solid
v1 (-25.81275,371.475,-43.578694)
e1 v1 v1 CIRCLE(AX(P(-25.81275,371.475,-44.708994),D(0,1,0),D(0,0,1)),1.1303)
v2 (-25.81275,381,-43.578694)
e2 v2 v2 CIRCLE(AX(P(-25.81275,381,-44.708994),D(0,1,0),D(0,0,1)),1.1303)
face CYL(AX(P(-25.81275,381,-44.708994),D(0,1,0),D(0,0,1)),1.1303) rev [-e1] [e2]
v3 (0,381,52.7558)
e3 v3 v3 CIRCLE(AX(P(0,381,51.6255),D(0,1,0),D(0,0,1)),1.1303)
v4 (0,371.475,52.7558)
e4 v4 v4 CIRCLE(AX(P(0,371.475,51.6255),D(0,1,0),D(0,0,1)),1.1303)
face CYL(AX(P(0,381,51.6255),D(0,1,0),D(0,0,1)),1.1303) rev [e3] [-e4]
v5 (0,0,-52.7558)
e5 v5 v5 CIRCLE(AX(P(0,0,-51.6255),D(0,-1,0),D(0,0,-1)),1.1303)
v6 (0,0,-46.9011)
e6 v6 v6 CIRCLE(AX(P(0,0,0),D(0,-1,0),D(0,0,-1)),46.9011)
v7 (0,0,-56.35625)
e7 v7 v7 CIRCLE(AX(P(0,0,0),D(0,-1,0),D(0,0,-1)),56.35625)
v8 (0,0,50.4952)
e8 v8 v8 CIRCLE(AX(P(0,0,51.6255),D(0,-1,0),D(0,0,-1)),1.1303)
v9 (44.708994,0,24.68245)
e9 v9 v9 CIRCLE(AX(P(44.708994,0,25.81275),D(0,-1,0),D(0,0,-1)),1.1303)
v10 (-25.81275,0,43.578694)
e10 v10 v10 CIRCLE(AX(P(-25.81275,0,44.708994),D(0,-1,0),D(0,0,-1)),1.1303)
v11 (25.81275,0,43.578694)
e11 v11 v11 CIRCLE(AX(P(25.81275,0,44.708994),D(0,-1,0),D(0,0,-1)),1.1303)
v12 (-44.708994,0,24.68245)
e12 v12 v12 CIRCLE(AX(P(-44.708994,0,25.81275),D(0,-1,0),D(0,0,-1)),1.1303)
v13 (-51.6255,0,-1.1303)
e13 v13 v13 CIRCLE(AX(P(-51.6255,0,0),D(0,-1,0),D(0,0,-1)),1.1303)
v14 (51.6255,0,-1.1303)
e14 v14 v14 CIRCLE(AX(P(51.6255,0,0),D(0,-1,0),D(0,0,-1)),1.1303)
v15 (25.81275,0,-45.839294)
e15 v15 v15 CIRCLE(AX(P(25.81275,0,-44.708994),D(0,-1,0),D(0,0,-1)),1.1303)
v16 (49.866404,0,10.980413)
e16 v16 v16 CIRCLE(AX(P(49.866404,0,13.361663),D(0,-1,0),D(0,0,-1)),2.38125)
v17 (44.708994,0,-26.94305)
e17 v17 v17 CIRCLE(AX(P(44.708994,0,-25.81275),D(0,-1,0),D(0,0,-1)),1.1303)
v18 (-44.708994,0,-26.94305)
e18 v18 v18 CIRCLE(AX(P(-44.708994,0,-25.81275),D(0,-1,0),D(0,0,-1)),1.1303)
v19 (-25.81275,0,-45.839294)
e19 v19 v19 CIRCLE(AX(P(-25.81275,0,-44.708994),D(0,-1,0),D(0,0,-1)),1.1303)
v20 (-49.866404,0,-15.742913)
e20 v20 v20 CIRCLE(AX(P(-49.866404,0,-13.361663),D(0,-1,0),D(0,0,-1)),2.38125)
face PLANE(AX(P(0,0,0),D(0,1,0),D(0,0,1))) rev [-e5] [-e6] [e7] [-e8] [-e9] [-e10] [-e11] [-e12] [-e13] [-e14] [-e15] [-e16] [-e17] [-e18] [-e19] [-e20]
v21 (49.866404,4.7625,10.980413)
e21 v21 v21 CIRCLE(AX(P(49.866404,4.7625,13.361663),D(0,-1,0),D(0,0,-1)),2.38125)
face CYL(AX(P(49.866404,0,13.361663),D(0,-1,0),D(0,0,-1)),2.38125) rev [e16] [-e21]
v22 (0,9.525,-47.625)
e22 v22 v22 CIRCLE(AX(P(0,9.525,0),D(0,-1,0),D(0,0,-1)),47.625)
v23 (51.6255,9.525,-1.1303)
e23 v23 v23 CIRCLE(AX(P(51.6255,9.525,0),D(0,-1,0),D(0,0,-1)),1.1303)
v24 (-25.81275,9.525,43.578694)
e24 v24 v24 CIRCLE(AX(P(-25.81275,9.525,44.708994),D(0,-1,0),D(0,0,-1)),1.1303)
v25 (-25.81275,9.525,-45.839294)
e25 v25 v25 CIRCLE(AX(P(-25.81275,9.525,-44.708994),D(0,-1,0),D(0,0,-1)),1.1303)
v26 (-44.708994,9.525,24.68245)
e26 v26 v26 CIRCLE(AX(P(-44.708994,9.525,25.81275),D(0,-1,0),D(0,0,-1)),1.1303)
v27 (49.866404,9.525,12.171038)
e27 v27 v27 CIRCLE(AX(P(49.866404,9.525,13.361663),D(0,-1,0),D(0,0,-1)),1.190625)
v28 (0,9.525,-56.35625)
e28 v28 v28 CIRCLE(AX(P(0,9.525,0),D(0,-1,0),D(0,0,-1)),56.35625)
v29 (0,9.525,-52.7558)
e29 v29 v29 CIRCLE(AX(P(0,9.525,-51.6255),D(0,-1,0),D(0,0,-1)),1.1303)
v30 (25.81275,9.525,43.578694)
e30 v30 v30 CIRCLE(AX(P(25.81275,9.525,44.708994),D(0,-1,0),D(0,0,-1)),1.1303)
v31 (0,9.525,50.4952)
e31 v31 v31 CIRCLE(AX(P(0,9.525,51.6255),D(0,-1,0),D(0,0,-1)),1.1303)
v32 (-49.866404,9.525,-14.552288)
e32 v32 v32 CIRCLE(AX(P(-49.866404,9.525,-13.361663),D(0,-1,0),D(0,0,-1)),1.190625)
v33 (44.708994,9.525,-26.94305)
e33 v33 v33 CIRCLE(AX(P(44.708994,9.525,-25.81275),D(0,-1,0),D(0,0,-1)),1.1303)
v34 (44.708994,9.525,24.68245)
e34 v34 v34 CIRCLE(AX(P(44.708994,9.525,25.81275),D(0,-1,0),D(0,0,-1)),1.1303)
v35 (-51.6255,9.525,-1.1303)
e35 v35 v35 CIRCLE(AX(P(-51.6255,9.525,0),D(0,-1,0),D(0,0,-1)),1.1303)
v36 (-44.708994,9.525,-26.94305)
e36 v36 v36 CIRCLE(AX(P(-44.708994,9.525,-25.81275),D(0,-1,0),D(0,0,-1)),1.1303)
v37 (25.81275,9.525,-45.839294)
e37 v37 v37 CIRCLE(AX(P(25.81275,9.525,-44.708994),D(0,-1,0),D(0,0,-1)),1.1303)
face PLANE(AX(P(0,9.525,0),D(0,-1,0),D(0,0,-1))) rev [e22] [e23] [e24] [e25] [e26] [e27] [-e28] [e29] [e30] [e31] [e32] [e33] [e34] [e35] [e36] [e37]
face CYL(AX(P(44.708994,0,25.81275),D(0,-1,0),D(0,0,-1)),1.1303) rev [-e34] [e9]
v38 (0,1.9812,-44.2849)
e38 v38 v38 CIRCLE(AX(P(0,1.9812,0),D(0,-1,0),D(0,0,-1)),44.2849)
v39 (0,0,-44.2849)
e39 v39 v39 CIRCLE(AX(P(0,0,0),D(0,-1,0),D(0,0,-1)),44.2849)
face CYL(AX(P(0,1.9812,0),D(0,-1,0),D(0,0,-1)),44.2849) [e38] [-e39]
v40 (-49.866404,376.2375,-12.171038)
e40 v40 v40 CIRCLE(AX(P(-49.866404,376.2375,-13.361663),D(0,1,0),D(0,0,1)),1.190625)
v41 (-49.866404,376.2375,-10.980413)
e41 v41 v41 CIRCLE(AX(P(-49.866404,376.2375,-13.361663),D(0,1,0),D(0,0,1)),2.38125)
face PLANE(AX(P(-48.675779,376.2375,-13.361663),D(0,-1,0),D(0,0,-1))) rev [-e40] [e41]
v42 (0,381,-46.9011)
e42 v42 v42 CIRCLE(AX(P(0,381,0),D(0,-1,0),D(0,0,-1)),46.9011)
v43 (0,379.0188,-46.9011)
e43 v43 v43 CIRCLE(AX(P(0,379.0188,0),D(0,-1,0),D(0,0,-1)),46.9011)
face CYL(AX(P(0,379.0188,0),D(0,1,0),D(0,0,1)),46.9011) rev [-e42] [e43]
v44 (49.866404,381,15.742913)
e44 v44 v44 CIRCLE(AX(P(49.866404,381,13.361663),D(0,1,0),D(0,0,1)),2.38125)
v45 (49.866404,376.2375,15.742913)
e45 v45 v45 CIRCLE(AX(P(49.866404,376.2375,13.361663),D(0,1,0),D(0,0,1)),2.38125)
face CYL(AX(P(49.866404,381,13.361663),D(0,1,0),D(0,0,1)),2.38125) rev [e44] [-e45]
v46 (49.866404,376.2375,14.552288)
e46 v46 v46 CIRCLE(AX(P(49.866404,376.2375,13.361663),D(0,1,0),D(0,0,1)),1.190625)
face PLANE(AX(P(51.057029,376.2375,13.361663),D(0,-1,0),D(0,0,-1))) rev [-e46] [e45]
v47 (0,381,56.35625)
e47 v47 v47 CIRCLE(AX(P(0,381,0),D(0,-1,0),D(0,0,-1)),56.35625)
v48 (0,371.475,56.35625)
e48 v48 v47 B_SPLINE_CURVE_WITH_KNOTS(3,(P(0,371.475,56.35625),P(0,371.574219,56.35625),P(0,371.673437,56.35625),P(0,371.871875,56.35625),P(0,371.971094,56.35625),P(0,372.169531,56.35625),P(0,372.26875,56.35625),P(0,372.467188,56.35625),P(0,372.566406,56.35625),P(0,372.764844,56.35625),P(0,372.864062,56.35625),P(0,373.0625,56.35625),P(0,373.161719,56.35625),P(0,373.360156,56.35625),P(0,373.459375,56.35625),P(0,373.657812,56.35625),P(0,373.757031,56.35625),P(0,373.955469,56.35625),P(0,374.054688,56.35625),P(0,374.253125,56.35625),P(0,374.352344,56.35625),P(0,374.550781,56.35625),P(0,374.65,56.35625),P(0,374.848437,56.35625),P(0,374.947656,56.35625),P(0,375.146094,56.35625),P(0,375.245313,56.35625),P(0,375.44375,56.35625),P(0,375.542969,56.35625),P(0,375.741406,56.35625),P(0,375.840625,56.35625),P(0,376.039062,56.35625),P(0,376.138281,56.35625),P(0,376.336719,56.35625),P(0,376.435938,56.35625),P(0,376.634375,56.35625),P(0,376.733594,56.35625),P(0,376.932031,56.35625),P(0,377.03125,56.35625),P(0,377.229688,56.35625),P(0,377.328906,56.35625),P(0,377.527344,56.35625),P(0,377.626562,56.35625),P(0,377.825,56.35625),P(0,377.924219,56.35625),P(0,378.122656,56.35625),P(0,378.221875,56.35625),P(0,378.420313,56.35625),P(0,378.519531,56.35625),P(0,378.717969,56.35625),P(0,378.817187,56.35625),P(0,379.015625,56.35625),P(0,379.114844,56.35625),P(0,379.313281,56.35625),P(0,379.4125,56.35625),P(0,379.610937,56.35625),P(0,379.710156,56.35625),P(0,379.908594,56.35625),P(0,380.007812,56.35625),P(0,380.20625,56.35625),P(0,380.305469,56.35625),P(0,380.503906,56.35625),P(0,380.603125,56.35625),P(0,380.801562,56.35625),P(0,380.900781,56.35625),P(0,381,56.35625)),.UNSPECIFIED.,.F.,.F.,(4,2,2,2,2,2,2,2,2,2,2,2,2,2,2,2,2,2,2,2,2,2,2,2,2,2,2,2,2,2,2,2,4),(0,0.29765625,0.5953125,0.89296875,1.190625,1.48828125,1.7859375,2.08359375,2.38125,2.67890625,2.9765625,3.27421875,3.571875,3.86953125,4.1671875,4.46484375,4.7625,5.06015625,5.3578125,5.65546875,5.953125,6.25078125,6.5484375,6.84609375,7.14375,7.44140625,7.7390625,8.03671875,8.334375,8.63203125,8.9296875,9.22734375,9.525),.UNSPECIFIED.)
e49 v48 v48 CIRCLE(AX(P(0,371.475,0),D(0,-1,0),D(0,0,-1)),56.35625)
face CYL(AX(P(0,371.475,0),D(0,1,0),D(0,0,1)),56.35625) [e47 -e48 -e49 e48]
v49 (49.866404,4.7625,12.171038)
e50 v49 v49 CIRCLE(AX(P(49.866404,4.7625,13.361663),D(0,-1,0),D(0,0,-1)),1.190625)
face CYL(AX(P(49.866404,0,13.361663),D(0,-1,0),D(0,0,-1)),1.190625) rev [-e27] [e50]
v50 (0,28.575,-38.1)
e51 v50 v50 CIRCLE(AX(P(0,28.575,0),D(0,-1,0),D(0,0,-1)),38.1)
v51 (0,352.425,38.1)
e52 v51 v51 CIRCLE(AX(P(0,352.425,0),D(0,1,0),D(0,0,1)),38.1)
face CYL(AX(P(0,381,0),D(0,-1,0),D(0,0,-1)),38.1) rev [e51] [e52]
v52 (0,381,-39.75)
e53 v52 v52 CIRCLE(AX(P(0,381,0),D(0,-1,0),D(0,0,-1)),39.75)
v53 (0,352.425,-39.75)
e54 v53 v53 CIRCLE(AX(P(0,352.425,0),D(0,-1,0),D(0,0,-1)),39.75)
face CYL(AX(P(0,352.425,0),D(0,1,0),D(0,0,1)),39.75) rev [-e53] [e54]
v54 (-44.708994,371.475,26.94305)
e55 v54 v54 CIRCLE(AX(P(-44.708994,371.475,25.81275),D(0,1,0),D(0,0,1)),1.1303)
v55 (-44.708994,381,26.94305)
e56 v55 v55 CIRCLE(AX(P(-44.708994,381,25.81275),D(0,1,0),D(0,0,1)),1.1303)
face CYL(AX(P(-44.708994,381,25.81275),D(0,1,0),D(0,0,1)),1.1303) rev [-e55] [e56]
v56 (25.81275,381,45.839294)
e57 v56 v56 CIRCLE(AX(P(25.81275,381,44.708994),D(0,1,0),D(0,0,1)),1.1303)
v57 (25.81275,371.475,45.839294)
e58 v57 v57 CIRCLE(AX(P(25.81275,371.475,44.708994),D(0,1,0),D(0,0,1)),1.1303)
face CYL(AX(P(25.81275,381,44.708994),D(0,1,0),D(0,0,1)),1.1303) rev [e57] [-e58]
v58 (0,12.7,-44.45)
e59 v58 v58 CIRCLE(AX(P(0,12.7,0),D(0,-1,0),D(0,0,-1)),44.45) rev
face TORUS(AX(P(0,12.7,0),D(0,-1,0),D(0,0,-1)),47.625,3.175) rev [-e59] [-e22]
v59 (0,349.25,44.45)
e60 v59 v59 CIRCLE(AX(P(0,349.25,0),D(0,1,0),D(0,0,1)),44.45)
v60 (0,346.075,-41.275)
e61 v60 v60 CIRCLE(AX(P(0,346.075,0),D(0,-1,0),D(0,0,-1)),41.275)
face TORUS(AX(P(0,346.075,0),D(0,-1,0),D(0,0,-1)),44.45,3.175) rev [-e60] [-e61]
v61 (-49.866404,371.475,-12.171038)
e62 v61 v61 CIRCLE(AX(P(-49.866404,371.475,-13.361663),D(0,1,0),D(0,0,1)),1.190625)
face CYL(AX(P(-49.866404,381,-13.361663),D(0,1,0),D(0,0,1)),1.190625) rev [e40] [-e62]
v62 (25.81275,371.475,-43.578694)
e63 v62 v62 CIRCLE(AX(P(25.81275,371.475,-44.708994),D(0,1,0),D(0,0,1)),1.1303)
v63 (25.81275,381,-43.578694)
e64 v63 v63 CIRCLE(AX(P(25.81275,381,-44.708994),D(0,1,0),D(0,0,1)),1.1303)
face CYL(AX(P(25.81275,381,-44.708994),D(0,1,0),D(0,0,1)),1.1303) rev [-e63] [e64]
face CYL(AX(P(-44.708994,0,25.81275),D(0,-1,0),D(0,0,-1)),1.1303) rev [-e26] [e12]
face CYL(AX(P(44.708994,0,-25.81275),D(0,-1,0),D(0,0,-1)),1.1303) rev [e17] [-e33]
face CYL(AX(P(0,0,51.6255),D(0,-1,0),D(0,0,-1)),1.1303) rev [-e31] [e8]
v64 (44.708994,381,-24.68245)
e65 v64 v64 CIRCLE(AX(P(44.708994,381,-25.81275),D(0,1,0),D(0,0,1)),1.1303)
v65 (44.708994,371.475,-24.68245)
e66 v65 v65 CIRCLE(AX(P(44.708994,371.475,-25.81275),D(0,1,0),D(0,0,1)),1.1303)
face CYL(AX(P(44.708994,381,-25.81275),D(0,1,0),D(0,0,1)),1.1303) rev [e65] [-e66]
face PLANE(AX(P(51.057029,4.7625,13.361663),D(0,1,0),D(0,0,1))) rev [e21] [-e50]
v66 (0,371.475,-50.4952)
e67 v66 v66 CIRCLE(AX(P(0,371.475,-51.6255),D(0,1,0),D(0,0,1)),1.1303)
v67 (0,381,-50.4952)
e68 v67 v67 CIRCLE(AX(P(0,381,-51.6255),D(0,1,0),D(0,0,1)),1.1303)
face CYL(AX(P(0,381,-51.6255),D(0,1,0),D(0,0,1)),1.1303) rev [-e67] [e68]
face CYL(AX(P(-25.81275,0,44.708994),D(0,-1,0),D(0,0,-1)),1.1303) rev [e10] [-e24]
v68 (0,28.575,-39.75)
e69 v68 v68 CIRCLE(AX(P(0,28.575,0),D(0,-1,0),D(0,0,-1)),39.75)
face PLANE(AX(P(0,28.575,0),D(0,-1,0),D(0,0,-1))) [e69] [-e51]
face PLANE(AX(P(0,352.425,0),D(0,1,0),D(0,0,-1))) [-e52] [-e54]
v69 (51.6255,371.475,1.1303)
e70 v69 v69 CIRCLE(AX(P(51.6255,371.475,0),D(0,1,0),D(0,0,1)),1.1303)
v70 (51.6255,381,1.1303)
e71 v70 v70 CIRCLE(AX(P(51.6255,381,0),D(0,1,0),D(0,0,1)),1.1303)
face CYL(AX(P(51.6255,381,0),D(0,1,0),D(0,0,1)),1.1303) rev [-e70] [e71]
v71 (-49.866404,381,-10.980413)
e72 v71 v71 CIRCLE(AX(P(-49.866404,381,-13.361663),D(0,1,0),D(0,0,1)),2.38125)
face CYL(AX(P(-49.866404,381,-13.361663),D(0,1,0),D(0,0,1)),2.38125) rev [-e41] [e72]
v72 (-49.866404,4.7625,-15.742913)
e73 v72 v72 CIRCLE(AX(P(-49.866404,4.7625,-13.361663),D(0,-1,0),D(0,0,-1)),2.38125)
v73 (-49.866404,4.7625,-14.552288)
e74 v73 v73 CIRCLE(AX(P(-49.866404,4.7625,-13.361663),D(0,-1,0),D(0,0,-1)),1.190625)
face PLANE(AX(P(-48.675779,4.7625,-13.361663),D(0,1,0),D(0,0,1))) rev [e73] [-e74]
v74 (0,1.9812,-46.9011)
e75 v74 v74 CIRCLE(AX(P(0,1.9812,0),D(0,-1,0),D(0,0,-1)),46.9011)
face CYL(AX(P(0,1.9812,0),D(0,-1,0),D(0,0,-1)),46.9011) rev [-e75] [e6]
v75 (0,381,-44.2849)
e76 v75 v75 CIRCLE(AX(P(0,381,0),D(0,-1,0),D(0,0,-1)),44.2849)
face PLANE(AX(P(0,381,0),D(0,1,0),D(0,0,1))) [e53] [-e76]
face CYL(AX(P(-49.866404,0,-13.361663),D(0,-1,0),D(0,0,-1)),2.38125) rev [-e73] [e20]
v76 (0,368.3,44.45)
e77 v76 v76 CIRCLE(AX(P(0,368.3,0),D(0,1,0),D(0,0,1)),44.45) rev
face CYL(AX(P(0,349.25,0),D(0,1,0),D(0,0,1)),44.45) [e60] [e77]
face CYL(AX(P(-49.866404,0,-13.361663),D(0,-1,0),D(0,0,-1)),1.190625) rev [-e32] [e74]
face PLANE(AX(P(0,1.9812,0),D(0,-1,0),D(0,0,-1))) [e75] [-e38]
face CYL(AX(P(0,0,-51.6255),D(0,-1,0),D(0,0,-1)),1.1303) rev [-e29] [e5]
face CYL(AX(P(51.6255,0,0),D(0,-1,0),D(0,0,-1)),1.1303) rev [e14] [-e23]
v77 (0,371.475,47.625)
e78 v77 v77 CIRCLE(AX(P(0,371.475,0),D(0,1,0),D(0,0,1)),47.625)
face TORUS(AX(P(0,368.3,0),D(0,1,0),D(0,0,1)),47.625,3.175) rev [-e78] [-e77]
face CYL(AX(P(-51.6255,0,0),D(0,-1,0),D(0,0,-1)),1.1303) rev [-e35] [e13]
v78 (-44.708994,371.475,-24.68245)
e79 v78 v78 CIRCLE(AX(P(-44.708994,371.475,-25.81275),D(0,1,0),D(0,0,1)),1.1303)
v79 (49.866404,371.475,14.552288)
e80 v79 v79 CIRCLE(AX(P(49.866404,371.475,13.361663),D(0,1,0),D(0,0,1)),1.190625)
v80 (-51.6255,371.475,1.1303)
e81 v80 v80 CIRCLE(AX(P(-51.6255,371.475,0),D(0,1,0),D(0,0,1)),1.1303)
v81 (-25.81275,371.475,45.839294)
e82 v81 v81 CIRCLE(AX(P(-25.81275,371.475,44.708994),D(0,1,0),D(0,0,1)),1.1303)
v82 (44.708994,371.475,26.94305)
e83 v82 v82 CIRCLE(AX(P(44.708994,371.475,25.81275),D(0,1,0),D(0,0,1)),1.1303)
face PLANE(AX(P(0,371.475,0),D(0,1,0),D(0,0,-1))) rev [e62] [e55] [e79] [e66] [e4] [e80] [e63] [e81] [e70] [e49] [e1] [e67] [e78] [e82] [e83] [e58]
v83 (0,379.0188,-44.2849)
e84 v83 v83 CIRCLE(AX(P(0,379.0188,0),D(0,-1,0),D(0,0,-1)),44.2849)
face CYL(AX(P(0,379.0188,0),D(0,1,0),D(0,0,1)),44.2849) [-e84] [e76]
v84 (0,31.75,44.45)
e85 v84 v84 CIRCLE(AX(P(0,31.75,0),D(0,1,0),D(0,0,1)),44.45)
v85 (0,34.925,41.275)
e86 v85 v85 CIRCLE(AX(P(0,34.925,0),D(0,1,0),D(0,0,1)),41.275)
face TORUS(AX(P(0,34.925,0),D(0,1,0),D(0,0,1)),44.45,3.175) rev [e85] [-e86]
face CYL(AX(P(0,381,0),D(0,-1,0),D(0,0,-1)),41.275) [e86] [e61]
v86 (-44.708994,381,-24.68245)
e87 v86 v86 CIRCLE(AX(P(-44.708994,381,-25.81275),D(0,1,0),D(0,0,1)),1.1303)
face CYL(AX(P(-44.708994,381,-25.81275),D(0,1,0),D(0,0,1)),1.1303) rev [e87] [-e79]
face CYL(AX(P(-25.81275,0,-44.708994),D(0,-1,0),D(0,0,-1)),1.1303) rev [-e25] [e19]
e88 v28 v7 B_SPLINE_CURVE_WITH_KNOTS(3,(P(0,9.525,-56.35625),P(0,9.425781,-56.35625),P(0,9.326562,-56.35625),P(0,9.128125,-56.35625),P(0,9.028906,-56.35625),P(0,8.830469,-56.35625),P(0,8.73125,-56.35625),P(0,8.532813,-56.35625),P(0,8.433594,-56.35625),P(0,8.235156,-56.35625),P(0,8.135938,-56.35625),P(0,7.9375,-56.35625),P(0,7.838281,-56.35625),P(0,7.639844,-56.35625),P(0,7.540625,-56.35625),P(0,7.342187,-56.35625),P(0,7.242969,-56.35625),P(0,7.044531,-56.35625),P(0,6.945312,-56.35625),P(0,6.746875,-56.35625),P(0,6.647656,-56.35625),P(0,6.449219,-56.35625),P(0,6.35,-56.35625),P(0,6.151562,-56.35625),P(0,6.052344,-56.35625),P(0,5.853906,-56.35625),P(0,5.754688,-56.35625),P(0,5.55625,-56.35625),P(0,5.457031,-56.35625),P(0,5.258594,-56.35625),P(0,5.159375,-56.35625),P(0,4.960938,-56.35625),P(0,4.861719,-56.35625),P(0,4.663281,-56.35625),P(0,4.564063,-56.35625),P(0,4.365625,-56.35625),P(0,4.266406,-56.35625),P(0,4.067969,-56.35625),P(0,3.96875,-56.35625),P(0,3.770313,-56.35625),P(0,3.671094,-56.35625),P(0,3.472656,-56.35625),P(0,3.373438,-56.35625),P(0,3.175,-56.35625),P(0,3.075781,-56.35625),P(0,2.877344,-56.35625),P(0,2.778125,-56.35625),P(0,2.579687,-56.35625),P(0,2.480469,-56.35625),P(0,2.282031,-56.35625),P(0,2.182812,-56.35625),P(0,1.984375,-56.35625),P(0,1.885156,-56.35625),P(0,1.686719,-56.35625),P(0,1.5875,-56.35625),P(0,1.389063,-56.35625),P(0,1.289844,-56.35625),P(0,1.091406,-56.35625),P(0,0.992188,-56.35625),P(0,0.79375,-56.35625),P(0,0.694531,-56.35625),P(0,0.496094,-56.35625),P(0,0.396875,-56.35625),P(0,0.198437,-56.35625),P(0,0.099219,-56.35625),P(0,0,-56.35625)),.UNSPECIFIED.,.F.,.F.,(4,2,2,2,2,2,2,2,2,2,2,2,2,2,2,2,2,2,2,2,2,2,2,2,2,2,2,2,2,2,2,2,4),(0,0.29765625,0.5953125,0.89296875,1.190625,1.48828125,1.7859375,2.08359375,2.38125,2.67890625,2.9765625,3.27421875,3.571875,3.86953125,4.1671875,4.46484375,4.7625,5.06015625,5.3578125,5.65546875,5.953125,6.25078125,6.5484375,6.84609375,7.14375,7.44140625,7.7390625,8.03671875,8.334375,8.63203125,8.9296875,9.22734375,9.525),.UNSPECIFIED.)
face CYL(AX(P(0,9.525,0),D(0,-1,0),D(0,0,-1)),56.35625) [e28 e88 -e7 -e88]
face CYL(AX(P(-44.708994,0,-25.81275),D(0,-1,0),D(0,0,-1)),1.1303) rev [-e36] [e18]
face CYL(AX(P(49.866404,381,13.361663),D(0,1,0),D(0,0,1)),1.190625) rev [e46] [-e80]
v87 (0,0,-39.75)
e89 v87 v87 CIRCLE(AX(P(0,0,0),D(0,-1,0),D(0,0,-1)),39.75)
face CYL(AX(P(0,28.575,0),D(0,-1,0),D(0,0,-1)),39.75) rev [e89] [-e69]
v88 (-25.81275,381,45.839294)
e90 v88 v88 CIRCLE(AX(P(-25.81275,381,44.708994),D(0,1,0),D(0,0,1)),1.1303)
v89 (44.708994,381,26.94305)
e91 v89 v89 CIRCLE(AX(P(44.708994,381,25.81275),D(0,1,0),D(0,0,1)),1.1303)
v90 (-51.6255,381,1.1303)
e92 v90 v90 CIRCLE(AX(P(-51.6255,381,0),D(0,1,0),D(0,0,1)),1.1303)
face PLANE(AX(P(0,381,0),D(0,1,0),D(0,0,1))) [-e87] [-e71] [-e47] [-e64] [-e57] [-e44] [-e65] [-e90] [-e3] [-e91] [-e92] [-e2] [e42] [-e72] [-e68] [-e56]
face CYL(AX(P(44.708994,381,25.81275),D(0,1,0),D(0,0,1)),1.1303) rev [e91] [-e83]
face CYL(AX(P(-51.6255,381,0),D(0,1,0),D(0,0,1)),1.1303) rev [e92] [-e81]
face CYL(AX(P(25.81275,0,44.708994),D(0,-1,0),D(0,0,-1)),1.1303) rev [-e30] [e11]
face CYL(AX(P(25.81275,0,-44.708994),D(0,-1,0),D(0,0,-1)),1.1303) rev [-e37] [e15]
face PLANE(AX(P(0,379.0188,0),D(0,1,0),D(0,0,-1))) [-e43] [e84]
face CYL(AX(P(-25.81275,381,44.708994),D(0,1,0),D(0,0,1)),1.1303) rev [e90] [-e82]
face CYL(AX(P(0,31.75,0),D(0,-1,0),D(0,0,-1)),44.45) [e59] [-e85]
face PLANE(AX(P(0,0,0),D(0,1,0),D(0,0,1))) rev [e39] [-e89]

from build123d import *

# Parameters (mm, degrees)
SKETCH2_R               = 41.275
SKETCH2_R_2             = 38.1
BASE_CYLINDER_DEPTH     = 381
SKETCH3_R               = 56.35625
SKETCH3_R_2             = 38.1
AFT_FLANGE_DEPTH        = 9.525
SKETCH34_R              = 39.75
TEMPERATUREINSERT_DEPTH = 28.575
SKETCH6_R               = 46.9011
SKETCH6_R_2             = 44.2849
AFT_O_RING_DEPTH        = 1.9812
SKETCH33_R              = 44.45
SKETCH33_R_2            = 41.275
CRITICALBOSS_DEPTH      = 22.225
FILLET1_R               = 3.175
BOLT_CIRCLE_D           = 2.2606
BOLT_CIRCLE_DEPTH       = 381
HOLE1_D                 = 2.38125
HOLE1_DEPTH             = 381
HOLE1_CBORE_D           = 4.7625
HOLE1_CBORE_DEPTH       = 4.7625
FILLET1_OF_MIRROR1_R    = 3.175


with BuildPart() as part:
    # Sketch2 → Base Cylinder (new body)
    with BuildSketch(Plane(origin=(0, 0, 0), x_dir=(1, 0, 0), z_dir=(0, 1, 0))):
        with Locations(Location((0, 0, 0), (0, 0, 270))):
            Circle(SKETCH2_R)
        with Locations(Location((0, 0, 0), (0, 0, 270))):
            Circle(SKETCH2_R_2, mode=Mode.SUBTRACT)
    extrude(amount=BASE_CYLINDER_DEPTH)

    # Sketch3 → Aft Flange (add)
    with BuildSketch(Plane.XZ):
        with Locations(Location((0, 0, 0), (0, 0, 270))):
            Circle(SKETCH3_R)
        with Locations(Location((0, 0, 0), (0, 0, 90))):
            Circle(SKETCH3_R_2, mode=Mode.SUBTRACT)
    aft_flange = extrude(amount=-AFT_FLANGE_DEPTH)

    # Sketch34 → TemperatureInsert (cut)
    with BuildSketch(Plane.XZ):
        with Locations(Location((0, 0, 0), (0, 0, 270))):
            Circle(SKETCH34_R)
    temperatureinsert = extrude(amount=-TEMPERATUREINSERT_DEPTH, mode=Mode.SUBTRACT)

    # Sketch6 → Aft O-Ring (cut)
    with BuildSketch(Plane.XZ):
        with Locations(Location((0, 0, 0), (0, 0, 270))):
            Circle(SKETCH6_R)
        with Locations(Location((0, 0, 0), (0, 0, 270))):
            Circle(SKETCH6_R_2, mode=Mode.SUBTRACT)
    aft_o_ring = extrude(amount=-AFT_O_RING_DEPTH, mode=Mode.SUBTRACT)

    # Sketch33 → CriticalBoss (add)
    with BuildSketch(Plane(origin=(0, 9.525, 0), x_dir=(1, 0, 0), z_dir=(0, 1, 0))):
        with Locations(Location((0, 0, 0), (0, 0, 90))):
            Circle(SKETCH33_R)
        with Locations(Location((0, 0, 0), (0, 0, 270))):
            Circle(SKETCH33_R_2, mode=Mode.SUBTRACT)
    criticalboss = extrude(amount=CRITICALBOSS_DEPTH)

    # Fillet1
    fillet1_edges = [part.edges().sort_by_distance(p)[0] for p in [
        (0, 9.525, 44.45),
        (0, 31.75, -41.275),
    ]]
    fillet(fillet1_edges, radius=FILLET1_R - 0.0001)  # a hair under: the kernel refuses the full size

    # Bolt Circle
    with Locations(Plane(origin=(0, 0, 0), x_dir=(-1, 0, 0), z_dir=(0, -1, 0))):
        with Locations((-25.81275, -44.708994483), (-44.708994483, -25.81275), (-51.6255, 0), (-44.708994483, 25.81275), (-25.81275, 44.708994483), (0, 51.6255), (25.81275, 44.708994483), (44.708994483, 25.81275), (51.6255, 0), (44.708994483, -25.81275), (25.81275, -44.708994483), (0, -51.6255)):
            bolt_circle = Hole(BOLT_CIRCLE_D / 2, depth=BOLT_CIRCLE_DEPTH)

    # Hole1
    with Locations(Plane(origin=(0, 0, 0), x_dir=(-1, 0, 0), z_dir=(0, -1, 0))):
        with Locations((49.866403745, 13.361662613), (-49.866403745, -13.361662613)):
            hole1 = CounterBoreHole(HOLE1_D / 2, HOLE1_CBORE_D / 2, HOLE1_CBORE_DEPTH, depth=HOLE1_DEPTH)

    # Mirror1: Aft Flange, TemperatureInsert, Aft O-Ring, CriticalBoss, Bolt Circle, Hole1 across plane
    add(aft_flange.mirror(Plane.ZX.offset(190.5)))
    add(temperatureinsert.mirror(Plane.ZX.offset(190.5)), mode=Mode.SUBTRACT)
    add(aft_o_ring.mirror(Plane.ZX.offset(190.5)), mode=Mode.SUBTRACT)
    add(criticalboss.mirror(Plane.ZX.offset(190.5)))
    add(bolt_circle.mirror(Plane.ZX.offset(190.5)), mode=Mode.SUBTRACT)
    add(hole1.mirror(Plane.ZX.offset(190.5)), mode=Mode.SUBTRACT)

    # Fillet1 of Mirror1
    fillet1_of_mirror1_edges = [part.edges().sort_by_distance(p)[0] for p in [
        (0, 371.475, 44.45),
        (0, 349.25, -41.275),
    ]]
    fillet(fillet1_of_mirror1_edges, radius=FILLET1_OF_MIRROR1_R - 0.0001)  # a hair under: the kernel refuses the full size


solid = part.part
